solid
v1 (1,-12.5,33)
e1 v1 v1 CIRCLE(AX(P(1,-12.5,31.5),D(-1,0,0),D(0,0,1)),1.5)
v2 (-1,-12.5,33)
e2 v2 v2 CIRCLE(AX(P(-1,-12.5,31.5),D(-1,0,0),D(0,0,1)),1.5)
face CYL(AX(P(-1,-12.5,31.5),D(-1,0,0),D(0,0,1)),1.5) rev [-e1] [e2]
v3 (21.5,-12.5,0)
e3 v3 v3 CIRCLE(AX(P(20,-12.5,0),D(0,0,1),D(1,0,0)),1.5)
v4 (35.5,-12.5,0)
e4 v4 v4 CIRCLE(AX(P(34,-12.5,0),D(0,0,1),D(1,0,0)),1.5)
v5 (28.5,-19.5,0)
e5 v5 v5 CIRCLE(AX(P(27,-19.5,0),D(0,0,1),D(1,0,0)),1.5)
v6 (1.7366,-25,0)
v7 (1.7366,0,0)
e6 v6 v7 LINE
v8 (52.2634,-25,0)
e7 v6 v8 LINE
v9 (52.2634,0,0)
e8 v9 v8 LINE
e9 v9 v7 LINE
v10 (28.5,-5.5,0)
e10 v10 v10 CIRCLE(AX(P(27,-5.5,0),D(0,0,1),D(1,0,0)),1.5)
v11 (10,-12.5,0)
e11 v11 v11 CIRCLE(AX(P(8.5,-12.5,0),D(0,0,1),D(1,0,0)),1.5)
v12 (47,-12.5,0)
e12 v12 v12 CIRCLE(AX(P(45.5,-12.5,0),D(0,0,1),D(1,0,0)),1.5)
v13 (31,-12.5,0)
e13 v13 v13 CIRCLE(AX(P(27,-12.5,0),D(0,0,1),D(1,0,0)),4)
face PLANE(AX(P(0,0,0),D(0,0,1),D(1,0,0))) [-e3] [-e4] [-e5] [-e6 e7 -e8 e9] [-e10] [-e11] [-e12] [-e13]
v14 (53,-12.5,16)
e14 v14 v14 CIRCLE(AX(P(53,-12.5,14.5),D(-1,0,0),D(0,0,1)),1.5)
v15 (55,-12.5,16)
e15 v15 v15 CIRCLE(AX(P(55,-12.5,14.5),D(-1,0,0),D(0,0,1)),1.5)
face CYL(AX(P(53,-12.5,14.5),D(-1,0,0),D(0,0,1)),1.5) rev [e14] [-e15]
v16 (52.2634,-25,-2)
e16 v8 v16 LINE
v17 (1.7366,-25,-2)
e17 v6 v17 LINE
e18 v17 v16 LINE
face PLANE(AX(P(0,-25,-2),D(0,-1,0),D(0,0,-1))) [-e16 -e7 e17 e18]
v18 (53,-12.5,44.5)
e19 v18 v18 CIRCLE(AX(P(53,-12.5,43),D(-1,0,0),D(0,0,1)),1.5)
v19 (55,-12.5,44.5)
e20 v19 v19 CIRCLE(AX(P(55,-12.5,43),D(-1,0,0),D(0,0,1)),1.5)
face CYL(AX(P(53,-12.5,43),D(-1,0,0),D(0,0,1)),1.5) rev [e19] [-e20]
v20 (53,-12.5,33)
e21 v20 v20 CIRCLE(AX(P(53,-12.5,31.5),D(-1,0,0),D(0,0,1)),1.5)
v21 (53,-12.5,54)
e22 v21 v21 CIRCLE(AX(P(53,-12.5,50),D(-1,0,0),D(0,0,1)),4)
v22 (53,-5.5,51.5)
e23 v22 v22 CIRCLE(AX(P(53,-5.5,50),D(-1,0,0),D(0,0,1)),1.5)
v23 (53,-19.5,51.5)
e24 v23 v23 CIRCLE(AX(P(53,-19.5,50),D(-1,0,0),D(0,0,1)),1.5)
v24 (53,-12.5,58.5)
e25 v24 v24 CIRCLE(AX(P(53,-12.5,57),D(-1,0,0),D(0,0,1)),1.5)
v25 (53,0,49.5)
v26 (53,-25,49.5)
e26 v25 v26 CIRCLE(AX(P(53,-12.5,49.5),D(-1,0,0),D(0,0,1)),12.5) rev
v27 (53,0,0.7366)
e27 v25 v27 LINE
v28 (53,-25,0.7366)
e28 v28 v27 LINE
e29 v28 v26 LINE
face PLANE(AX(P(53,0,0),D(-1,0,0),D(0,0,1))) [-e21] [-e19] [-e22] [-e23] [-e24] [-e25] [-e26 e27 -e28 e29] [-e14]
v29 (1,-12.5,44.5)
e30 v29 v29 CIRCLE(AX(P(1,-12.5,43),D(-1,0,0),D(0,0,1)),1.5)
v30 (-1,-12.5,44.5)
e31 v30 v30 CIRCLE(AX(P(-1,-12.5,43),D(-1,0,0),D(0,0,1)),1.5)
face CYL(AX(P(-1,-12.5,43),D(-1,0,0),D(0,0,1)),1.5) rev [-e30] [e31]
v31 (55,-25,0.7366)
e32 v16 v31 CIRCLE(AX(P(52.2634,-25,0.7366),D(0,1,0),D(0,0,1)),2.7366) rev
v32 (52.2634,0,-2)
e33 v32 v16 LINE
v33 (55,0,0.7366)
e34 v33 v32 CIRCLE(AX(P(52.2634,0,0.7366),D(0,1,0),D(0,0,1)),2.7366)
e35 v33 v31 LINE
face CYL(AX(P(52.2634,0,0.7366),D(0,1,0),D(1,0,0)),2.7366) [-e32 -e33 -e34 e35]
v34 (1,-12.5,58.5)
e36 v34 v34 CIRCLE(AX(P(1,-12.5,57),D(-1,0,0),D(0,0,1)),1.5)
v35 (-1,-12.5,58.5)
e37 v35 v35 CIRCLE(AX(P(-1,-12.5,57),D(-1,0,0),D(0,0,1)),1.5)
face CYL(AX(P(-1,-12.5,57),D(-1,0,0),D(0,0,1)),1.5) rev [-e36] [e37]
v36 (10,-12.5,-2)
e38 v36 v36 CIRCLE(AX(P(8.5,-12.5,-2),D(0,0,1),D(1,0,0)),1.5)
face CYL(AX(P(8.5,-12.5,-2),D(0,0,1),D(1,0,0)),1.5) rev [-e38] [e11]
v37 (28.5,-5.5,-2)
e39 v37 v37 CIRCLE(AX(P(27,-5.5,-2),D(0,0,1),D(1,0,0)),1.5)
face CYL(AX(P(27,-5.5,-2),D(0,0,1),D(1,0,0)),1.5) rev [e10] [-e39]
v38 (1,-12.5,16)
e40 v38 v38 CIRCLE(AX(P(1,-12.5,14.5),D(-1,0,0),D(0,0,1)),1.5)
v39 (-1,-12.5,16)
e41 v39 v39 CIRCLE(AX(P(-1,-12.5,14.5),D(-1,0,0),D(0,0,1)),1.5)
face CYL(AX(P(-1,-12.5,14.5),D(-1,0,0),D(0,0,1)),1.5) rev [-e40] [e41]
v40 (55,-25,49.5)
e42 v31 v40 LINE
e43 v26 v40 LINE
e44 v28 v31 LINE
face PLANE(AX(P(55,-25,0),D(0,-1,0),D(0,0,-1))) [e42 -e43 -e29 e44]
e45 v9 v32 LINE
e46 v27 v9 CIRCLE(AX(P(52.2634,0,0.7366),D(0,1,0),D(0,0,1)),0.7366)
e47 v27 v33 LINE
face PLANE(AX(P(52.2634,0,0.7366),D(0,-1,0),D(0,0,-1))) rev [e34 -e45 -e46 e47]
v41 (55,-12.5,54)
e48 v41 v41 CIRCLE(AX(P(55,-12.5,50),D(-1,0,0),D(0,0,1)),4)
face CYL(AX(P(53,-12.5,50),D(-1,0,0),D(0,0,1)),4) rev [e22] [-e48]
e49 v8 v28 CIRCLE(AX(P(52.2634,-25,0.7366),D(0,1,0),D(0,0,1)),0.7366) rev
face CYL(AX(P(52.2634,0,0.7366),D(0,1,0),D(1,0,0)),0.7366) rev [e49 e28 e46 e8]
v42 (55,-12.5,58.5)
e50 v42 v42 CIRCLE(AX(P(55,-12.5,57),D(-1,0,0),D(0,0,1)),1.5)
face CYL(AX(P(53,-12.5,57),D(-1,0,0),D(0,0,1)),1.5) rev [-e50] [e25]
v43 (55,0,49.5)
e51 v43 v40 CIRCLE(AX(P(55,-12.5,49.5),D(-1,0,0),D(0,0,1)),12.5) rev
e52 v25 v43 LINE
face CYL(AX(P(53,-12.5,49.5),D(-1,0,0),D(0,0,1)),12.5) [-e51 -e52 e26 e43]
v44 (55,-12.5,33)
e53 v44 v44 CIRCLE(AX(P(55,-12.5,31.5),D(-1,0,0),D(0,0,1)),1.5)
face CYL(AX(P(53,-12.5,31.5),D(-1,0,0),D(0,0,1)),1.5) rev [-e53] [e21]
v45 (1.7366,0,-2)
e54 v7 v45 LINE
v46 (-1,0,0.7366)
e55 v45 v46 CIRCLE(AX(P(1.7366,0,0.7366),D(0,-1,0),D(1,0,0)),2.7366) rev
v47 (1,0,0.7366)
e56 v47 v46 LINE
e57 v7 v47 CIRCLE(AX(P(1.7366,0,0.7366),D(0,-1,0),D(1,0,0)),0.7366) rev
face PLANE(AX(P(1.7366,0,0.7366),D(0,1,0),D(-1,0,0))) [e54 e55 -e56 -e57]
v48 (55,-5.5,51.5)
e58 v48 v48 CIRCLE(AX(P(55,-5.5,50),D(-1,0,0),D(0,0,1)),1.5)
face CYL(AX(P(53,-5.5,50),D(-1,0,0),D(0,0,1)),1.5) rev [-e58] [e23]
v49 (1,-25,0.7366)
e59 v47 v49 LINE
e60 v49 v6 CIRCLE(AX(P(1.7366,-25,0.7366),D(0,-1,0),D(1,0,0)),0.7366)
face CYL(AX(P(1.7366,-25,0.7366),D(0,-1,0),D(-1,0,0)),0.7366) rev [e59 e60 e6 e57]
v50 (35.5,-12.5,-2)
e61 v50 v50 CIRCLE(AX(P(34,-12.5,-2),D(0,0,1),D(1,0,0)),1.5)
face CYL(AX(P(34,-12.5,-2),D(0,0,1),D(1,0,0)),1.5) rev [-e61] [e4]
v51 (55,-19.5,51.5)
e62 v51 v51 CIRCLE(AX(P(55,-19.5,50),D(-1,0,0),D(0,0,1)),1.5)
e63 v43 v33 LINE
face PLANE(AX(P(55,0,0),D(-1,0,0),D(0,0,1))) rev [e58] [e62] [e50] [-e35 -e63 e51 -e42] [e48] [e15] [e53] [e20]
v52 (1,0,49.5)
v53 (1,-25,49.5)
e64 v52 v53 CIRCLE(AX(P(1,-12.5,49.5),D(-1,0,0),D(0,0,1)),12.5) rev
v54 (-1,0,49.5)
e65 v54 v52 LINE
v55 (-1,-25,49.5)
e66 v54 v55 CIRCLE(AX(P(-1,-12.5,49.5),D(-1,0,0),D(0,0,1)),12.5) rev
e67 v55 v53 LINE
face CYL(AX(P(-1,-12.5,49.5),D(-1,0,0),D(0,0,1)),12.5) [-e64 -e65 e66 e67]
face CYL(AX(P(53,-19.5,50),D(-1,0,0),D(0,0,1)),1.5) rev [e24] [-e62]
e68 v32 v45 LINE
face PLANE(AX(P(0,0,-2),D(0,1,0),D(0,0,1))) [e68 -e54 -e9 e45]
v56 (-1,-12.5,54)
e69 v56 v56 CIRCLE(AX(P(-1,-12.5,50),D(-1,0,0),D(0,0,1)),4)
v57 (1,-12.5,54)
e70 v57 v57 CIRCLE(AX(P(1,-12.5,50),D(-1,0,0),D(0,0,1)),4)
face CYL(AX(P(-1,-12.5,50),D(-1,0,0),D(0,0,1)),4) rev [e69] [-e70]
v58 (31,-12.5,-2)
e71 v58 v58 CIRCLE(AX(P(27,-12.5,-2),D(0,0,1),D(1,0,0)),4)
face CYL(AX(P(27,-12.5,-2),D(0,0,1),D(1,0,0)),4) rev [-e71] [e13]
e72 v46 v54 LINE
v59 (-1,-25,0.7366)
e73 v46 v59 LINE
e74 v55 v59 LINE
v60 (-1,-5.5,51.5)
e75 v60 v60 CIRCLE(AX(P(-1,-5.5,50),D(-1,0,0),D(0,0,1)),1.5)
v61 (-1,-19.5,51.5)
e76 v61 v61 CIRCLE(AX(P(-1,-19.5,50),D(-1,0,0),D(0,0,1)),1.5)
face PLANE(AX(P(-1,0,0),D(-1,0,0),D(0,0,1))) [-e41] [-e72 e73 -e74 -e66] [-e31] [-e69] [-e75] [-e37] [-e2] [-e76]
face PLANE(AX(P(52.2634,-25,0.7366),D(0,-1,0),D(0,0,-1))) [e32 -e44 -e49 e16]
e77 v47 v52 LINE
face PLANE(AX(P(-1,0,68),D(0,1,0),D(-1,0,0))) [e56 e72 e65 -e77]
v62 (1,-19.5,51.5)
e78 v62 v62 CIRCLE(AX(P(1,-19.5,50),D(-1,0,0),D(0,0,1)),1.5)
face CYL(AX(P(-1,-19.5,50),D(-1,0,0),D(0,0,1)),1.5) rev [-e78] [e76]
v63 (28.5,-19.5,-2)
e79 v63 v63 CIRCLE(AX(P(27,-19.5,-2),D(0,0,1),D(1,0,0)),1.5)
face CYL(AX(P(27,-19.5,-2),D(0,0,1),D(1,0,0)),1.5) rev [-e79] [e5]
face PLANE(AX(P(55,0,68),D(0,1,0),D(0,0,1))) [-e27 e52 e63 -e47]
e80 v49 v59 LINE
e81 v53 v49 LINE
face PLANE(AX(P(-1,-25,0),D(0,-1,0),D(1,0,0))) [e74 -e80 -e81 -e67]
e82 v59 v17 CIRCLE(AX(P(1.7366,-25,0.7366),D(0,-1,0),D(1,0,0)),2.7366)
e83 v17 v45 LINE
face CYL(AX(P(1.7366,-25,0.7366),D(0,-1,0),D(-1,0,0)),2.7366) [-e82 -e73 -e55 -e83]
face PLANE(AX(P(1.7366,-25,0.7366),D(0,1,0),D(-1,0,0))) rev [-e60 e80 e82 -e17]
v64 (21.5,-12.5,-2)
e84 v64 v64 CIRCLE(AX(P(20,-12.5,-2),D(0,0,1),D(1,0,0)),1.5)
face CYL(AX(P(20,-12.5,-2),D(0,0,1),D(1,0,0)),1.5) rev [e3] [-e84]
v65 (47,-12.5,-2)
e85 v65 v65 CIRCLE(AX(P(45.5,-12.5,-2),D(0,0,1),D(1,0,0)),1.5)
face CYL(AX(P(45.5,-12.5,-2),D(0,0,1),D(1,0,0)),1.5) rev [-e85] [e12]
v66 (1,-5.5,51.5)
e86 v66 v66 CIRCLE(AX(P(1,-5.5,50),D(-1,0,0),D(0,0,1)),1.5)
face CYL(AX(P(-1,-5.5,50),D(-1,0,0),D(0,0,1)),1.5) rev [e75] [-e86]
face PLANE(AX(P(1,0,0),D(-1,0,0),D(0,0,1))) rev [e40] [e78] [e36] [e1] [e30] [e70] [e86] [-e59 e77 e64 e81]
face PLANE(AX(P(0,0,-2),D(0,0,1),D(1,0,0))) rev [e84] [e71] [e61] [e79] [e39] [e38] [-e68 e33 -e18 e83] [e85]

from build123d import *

# Parameters (mm, degrees)
SKETCH_1_W                         = 54
SKETCH_1_H                         = 25
SKETCH_1_R                         = 4
SKETCH_1_R_2                       = 1.5
SM_BASE_FLANGE_1_DEPTH             = 2
SM_EDGE_FLANGE_1_STRIP_W           = 10.4732
SM_EDGE_FLANGE_1_STRIP_H           = 2
SM_EDGE_FLANGE_1_STRIP_CUT_DEPTH   = 25
SM_EDGE_FLANGE_1_STRIP_2_W         = 10.4732
SM_EDGE_FLANGE_1_STRIP_2_H         = 2
SM_EDGE_FLANGE_1_STRIP_CUT_2_DEPTH = 25
SM_EDGE_FLANGE_1_DEPTH             = 25
SM_EDGE_FLANGE_1_BEND_DEPTH        = 25
SKETCH_12_R                        = 4
SKETCH_12_R_2                      = 1.5
CUT_EXTRUDE_1_DEPTH                = 72


# Sheet-metal steps are written as plain solids
with BuildPart() as part:
    # Sketch 1 → 基体-法兰1 (new body)
    with BuildSketch(Plane.XY):
        with Locations((27, -12.5)):
            Rectangle(SKETCH_1_W, SKETCH_1_H)
        with Locations((27, -12.5)):
            Circle(SKETCH_1_R, mode=Mode.SUBTRACT)
        with Locations((27, -5.5)):
            Circle(SKETCH_1_R_2, mode=Mode.SUBTRACT)
        with Locations((27, -19.5)):
            Circle(SKETCH_1_R_2, mode=Mode.SUBTRACT)
        with Locations((34, -12.5)):
            Circle(SKETCH_1_R_2, mode=Mode.SUBTRACT)
        with Locations((20, -12.5)):
            Circle(SKETCH_1_R_2, mode=Mode.SUBTRACT)
        with Locations((45.5, -12.5)):
            Circle(SKETCH_1_R_2, mode=Mode.SUBTRACT)
        with Locations((8.5, -12.5)):
            Circle(SKETCH_1_R_2, mode=Mode.SUBTRACT)
    extrude(amount=-SM_BASE_FLANGE_1_DEPTH)

    # 边线-法兰1 strip (across the edge) → 边线-法兰1 strip cut (cut)
    with BuildSketch(Plane(origin=(-1, 0, 0), x_dir=(1, 0, 0), z_dir=(0, -1, 0))):
        with Locations((-2.5, -1)):
            Rectangle(SM_EDGE_FLANGE_1_STRIP_W, SM_EDGE_FLANGE_1_STRIP_H)
    extrude(amount=SM_EDGE_FLANGE_1_STRIP_CUT_DEPTH, mode=Mode.SUBTRACT)

    # 边线-法兰1 strip 2 (across the edge) → 边线-法兰1 strip cut 2 (cut)
    with BuildSketch(Plane(origin=(55, -25, 0), x_dir=(-1, 0, 0), z_dir=(0, 1, 0))):
        with Locations((-2.5, -1)):
            Rectangle(SM_EDGE_FLANGE_1_STRIP_2_W, SM_EDGE_FLANGE_1_STRIP_2_H)
    extrude(amount=SM_EDGE_FLANGE_1_STRIP_CUT_2_DEPTH, mode=Mode.SUBTRACT)

    # 边线-法兰1 section (across the edge) → 边线-法兰1 (add)
    with BuildSketch(Plane(origin=(-1, 0, 0), x_dir=(1, 0, 0), z_dir=(0, -1, 0))):
        with BuildLine():
            Line((0, 0.7366), (0, 68))
            Line((0, 68), (2, 68))
            Line((2, 68), (2, 0.7366))
            ThreePointArc((2, 0.7366), (2.215745145, 0.215745145), (2.7366, 0))
            Line((2.7366, 0), (2.7366, -2))
            ThreePointArc((2.7366, -2), (0.801531583, -1.198468417), (0, 0.7366))
        make_face()
    extrude(amount=SM_EDGE_FLANGE_1_DEPTH)

    # 边线-法兰1 section 2 (across the edge) → 边线-法兰1 bend (add)
    with BuildSketch(Plane(origin=(55, -25, 0), x_dir=(-1, 0, 0), z_dir=(0, 1, 0))):
        with BuildLine():
            Line((0, 0.7366), (0, 68))
            Line((0, 68), (2, 68))
            Line((2, 68), (2, 0.7366))
            ThreePointArc((2, 0.7366), (2.215745145, 0.215745145), (2.7366, 0))
            Line((2.7366, 0), (2.7366, -2))
            ThreePointArc((2.7366, -2), (0.801531583, -1.198468417), (0, 0.7366))
        make_face()
    extrude(amount=SM_EDGE_FLANGE_1_BEND_DEPTH)

    # 草图12 → 切除-拉伸1 (cut)
    with BuildSketch(Plane(origin=(55, 0, 0), x_dir=(0, 0, -1), z_dir=(1, 0, 0))):
        with Locations(Location((-50, -12.5, 0), (0, 0, 180))):
            Circle(SKETCH_12_R)
        with Locations(Location((-57, -12.5, 0), (0, 0, 180))):
            Circle(SKETCH_12_R_2)
        with Locations(Location((-50, -5.5, 0), (0, 0, 180))):
            Circle(SKETCH_12_R_2)
        with Locations(Location((-43, -12.5, 0), (0, 0, 180))):
            Circle(SKETCH_12_R_2)
        with Locations(Location((-50, -19.5, 0), (0, 0, 180))):
            Circle(SKETCH_12_R_2)
        with Locations(Location((-31.5, -12.5, 0), (0, 0, 180))):
            Circle(SKETCH_12_R_2)
        with Locations(Location((-14.5, -12.5, 0), (0, 0, 180))):
            Circle(SKETCH_12_R_2)
        with BuildLine():
            Line((-49.5, -25), (-68, -25))
            Line((-68, -25), (-68, 0))
            Line((-68, 0), (-49.5, 0))
            ThreePointArc((-49.5, 0), (-62, -12.5), (-49.5, -25))
        make_face()
    extrude(amount=-CUT_EXTRUDE_1_DEPTH, mode=Mode.SUBTRACT)


solid = part.part
